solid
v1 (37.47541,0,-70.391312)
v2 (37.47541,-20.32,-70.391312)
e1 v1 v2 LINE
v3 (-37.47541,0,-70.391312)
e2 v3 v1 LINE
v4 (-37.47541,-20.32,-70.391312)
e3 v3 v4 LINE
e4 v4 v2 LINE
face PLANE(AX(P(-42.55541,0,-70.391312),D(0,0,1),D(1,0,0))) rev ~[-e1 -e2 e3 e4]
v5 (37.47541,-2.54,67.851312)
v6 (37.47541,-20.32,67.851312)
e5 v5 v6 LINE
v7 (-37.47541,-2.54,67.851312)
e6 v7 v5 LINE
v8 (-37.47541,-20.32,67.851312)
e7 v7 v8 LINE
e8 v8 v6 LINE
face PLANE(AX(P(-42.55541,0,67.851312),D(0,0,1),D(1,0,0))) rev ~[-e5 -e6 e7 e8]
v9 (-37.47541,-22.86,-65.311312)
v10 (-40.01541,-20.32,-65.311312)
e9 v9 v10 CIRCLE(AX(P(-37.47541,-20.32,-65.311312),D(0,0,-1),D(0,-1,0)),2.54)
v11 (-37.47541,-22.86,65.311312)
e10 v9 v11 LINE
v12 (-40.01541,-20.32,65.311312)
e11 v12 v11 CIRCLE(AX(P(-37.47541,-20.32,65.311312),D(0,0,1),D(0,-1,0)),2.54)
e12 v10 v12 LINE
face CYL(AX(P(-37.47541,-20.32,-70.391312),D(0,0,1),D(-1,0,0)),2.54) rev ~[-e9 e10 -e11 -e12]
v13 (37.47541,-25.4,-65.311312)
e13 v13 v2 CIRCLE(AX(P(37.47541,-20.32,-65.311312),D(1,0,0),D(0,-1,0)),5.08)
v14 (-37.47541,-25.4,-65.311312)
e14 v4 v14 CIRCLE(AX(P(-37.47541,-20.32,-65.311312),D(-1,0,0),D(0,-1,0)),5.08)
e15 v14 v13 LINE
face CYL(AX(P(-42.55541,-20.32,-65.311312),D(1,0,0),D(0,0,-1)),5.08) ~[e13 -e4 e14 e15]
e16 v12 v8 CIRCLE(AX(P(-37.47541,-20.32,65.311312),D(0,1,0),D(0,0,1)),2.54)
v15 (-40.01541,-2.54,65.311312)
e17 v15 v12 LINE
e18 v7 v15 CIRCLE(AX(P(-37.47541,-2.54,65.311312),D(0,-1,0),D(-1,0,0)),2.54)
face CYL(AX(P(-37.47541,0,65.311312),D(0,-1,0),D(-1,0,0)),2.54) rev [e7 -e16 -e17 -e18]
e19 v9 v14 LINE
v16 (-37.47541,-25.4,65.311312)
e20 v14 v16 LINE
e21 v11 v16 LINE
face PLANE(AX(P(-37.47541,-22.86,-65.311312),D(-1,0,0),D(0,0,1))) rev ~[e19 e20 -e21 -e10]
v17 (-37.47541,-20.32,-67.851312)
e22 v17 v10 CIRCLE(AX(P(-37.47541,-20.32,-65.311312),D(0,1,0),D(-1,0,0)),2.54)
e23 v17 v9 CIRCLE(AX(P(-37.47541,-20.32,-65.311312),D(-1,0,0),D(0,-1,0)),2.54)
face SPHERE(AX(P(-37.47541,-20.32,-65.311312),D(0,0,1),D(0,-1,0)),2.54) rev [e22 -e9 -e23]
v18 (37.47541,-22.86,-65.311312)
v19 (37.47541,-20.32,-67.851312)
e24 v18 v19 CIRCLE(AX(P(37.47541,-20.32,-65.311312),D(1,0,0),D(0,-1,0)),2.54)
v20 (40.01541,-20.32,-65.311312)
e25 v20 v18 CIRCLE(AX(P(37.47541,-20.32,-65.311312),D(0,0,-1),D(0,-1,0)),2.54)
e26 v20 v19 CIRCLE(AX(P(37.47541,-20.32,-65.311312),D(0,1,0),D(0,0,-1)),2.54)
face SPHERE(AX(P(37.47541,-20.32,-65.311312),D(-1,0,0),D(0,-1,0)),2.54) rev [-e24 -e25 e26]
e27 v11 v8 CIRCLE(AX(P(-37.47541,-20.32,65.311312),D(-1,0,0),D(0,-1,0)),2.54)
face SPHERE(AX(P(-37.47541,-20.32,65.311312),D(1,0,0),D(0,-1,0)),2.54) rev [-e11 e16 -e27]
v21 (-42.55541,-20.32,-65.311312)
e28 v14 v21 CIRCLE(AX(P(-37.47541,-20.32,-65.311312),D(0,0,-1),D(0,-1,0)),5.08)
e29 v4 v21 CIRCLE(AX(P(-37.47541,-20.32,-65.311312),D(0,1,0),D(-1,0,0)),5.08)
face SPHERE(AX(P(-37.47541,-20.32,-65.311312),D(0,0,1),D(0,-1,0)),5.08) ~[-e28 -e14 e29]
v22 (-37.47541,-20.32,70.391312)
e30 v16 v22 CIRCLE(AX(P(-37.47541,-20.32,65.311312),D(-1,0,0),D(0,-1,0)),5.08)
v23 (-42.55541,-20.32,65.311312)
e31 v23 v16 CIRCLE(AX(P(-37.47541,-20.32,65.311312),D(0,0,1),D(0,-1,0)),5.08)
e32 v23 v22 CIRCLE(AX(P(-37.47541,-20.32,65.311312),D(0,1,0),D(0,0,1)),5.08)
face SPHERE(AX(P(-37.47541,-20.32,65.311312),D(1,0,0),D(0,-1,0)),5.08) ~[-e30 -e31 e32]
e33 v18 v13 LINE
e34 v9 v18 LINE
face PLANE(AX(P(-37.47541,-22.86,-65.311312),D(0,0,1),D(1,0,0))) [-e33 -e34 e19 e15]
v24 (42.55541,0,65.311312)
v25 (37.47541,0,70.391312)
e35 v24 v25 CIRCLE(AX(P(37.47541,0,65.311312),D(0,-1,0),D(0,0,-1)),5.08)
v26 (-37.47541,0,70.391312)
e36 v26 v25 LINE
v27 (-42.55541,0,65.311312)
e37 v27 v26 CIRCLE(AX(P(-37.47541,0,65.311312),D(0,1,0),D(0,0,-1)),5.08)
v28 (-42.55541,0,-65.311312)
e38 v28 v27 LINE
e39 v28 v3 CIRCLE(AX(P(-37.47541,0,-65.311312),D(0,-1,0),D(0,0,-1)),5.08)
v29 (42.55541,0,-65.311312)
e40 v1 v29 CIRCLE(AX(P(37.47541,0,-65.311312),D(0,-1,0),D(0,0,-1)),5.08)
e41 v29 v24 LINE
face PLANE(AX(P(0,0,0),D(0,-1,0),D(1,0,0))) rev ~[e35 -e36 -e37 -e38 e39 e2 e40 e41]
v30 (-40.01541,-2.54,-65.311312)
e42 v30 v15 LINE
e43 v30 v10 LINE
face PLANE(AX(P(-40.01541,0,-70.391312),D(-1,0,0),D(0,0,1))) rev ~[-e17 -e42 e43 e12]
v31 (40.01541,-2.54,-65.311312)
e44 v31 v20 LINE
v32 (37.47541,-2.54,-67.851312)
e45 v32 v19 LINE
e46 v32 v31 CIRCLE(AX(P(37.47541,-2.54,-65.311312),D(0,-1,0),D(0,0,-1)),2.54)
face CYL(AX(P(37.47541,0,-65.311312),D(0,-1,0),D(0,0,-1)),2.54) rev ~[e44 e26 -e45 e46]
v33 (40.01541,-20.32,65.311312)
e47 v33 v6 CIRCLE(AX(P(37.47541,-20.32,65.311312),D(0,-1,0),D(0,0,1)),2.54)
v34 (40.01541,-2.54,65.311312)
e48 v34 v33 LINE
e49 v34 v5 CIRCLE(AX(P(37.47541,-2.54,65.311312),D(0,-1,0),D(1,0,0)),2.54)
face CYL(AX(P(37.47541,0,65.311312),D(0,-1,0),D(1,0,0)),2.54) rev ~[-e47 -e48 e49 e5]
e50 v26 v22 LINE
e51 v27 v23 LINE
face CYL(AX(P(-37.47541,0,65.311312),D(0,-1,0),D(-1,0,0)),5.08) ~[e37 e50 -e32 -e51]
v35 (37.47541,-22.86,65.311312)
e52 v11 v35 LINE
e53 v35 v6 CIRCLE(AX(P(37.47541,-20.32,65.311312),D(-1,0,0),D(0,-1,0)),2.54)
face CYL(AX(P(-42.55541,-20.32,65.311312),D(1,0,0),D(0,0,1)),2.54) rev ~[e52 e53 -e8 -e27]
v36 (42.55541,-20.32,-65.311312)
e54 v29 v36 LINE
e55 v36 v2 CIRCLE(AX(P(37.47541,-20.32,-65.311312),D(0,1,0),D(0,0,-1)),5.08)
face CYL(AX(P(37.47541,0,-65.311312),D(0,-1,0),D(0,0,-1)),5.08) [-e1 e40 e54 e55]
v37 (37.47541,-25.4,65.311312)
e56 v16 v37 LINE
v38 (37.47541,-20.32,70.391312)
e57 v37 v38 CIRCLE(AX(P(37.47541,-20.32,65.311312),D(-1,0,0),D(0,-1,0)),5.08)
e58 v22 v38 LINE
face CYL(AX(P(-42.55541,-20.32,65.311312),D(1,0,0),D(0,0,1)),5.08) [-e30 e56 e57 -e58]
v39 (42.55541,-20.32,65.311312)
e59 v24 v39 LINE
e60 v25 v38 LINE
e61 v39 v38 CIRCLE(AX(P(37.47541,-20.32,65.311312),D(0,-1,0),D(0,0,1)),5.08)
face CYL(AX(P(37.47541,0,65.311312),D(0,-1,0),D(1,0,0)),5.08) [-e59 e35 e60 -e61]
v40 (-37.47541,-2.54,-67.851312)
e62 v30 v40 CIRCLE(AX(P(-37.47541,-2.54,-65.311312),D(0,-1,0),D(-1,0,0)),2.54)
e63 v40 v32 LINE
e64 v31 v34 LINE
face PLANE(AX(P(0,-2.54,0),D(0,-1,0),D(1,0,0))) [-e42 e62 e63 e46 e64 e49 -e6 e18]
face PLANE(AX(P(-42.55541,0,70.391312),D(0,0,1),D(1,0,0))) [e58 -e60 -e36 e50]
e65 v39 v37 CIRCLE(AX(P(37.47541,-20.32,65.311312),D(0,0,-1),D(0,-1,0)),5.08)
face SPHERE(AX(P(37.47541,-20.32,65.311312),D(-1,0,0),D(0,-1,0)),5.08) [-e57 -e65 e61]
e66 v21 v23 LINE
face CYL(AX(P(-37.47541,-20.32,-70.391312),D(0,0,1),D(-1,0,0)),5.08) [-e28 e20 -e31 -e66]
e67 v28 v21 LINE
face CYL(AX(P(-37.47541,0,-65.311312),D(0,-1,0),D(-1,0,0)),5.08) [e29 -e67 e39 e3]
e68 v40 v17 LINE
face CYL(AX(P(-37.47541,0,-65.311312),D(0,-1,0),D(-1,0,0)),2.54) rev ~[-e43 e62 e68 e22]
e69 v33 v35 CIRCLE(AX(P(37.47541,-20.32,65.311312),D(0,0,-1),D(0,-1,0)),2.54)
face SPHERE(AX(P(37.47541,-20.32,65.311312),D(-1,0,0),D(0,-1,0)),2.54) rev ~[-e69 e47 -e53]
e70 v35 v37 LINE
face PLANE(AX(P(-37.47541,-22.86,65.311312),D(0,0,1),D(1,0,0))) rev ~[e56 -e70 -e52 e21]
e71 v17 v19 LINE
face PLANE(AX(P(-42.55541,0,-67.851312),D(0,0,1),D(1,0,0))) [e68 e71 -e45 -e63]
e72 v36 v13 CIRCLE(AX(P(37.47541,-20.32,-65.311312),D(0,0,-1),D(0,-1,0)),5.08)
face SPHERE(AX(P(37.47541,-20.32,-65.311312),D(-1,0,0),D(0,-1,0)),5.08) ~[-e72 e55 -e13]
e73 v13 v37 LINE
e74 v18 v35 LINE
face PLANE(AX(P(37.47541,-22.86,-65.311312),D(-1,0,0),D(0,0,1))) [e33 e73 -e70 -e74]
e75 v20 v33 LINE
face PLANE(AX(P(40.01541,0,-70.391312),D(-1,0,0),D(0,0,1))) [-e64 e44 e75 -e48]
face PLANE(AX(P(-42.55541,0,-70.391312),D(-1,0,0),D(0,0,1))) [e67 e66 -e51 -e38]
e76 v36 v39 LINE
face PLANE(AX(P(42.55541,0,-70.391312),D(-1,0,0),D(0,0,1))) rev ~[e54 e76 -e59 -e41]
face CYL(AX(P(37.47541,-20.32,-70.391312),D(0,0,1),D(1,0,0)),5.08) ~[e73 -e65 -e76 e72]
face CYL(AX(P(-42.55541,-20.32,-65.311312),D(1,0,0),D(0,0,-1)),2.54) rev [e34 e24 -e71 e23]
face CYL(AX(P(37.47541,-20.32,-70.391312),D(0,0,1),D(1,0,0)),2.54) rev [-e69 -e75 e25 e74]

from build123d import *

# Parameters (mm, degrees)
F0_W     = 85.1108208299
F0_H     = 140.7826244831
F1_DEPTH = 25.4
F2_R     = 5.08
F3_T     = -2.54


# Not quite as in the source:
# - a shell that OpenCascade refuses in one call is made with other operations: the cavity is built on its own and cut out


with BuildPart() as f1:
    # F0 (on Front) → F1 (new body)
    with BuildSketch(Plane.XZ):
        Rectangle(F0_W, F0_H)
    extrude(amount=F1_DEPTH)

    # F2
    f2_edges = [f1.edges().sort_by_distance(p)[0] for p in [
        (0, -25.4, 70.391312),
        (-42.55541, -25.4, 0),
        (0, -25.4, -70.391312),
        (42.55541, -25.4, 0),
        (-42.55541, -12.7, 70.391312),
        (42.55541, -12.7, 70.391312),
        (-42.55541, -12.7, -70.391312),
        (42.55541, -12.7, -70.391312),
    ]]
    fillet(f2_edges, radius=F2_R)

    # F3: a shell. OpenCascade refuses it in one call, so the cavity is built on its own and cut out:
    # the body offset inwards by the wall thickness, plus a prism from it out through each open face.
    f3_core = offset(f1.part, amount=F3_T, mode=Mode.PRIVATE)
    f3_exits = [f3_core.faces().sort_by_distance(p)[0] for p in [
        (0, -22.86, 0),
    ]]
    add(f3_core, mode=Mode.SUBTRACT)
    extrude(f3_exits, amount=-F3_T, mode=Mode.SUBTRACT)


solid = f1.part
